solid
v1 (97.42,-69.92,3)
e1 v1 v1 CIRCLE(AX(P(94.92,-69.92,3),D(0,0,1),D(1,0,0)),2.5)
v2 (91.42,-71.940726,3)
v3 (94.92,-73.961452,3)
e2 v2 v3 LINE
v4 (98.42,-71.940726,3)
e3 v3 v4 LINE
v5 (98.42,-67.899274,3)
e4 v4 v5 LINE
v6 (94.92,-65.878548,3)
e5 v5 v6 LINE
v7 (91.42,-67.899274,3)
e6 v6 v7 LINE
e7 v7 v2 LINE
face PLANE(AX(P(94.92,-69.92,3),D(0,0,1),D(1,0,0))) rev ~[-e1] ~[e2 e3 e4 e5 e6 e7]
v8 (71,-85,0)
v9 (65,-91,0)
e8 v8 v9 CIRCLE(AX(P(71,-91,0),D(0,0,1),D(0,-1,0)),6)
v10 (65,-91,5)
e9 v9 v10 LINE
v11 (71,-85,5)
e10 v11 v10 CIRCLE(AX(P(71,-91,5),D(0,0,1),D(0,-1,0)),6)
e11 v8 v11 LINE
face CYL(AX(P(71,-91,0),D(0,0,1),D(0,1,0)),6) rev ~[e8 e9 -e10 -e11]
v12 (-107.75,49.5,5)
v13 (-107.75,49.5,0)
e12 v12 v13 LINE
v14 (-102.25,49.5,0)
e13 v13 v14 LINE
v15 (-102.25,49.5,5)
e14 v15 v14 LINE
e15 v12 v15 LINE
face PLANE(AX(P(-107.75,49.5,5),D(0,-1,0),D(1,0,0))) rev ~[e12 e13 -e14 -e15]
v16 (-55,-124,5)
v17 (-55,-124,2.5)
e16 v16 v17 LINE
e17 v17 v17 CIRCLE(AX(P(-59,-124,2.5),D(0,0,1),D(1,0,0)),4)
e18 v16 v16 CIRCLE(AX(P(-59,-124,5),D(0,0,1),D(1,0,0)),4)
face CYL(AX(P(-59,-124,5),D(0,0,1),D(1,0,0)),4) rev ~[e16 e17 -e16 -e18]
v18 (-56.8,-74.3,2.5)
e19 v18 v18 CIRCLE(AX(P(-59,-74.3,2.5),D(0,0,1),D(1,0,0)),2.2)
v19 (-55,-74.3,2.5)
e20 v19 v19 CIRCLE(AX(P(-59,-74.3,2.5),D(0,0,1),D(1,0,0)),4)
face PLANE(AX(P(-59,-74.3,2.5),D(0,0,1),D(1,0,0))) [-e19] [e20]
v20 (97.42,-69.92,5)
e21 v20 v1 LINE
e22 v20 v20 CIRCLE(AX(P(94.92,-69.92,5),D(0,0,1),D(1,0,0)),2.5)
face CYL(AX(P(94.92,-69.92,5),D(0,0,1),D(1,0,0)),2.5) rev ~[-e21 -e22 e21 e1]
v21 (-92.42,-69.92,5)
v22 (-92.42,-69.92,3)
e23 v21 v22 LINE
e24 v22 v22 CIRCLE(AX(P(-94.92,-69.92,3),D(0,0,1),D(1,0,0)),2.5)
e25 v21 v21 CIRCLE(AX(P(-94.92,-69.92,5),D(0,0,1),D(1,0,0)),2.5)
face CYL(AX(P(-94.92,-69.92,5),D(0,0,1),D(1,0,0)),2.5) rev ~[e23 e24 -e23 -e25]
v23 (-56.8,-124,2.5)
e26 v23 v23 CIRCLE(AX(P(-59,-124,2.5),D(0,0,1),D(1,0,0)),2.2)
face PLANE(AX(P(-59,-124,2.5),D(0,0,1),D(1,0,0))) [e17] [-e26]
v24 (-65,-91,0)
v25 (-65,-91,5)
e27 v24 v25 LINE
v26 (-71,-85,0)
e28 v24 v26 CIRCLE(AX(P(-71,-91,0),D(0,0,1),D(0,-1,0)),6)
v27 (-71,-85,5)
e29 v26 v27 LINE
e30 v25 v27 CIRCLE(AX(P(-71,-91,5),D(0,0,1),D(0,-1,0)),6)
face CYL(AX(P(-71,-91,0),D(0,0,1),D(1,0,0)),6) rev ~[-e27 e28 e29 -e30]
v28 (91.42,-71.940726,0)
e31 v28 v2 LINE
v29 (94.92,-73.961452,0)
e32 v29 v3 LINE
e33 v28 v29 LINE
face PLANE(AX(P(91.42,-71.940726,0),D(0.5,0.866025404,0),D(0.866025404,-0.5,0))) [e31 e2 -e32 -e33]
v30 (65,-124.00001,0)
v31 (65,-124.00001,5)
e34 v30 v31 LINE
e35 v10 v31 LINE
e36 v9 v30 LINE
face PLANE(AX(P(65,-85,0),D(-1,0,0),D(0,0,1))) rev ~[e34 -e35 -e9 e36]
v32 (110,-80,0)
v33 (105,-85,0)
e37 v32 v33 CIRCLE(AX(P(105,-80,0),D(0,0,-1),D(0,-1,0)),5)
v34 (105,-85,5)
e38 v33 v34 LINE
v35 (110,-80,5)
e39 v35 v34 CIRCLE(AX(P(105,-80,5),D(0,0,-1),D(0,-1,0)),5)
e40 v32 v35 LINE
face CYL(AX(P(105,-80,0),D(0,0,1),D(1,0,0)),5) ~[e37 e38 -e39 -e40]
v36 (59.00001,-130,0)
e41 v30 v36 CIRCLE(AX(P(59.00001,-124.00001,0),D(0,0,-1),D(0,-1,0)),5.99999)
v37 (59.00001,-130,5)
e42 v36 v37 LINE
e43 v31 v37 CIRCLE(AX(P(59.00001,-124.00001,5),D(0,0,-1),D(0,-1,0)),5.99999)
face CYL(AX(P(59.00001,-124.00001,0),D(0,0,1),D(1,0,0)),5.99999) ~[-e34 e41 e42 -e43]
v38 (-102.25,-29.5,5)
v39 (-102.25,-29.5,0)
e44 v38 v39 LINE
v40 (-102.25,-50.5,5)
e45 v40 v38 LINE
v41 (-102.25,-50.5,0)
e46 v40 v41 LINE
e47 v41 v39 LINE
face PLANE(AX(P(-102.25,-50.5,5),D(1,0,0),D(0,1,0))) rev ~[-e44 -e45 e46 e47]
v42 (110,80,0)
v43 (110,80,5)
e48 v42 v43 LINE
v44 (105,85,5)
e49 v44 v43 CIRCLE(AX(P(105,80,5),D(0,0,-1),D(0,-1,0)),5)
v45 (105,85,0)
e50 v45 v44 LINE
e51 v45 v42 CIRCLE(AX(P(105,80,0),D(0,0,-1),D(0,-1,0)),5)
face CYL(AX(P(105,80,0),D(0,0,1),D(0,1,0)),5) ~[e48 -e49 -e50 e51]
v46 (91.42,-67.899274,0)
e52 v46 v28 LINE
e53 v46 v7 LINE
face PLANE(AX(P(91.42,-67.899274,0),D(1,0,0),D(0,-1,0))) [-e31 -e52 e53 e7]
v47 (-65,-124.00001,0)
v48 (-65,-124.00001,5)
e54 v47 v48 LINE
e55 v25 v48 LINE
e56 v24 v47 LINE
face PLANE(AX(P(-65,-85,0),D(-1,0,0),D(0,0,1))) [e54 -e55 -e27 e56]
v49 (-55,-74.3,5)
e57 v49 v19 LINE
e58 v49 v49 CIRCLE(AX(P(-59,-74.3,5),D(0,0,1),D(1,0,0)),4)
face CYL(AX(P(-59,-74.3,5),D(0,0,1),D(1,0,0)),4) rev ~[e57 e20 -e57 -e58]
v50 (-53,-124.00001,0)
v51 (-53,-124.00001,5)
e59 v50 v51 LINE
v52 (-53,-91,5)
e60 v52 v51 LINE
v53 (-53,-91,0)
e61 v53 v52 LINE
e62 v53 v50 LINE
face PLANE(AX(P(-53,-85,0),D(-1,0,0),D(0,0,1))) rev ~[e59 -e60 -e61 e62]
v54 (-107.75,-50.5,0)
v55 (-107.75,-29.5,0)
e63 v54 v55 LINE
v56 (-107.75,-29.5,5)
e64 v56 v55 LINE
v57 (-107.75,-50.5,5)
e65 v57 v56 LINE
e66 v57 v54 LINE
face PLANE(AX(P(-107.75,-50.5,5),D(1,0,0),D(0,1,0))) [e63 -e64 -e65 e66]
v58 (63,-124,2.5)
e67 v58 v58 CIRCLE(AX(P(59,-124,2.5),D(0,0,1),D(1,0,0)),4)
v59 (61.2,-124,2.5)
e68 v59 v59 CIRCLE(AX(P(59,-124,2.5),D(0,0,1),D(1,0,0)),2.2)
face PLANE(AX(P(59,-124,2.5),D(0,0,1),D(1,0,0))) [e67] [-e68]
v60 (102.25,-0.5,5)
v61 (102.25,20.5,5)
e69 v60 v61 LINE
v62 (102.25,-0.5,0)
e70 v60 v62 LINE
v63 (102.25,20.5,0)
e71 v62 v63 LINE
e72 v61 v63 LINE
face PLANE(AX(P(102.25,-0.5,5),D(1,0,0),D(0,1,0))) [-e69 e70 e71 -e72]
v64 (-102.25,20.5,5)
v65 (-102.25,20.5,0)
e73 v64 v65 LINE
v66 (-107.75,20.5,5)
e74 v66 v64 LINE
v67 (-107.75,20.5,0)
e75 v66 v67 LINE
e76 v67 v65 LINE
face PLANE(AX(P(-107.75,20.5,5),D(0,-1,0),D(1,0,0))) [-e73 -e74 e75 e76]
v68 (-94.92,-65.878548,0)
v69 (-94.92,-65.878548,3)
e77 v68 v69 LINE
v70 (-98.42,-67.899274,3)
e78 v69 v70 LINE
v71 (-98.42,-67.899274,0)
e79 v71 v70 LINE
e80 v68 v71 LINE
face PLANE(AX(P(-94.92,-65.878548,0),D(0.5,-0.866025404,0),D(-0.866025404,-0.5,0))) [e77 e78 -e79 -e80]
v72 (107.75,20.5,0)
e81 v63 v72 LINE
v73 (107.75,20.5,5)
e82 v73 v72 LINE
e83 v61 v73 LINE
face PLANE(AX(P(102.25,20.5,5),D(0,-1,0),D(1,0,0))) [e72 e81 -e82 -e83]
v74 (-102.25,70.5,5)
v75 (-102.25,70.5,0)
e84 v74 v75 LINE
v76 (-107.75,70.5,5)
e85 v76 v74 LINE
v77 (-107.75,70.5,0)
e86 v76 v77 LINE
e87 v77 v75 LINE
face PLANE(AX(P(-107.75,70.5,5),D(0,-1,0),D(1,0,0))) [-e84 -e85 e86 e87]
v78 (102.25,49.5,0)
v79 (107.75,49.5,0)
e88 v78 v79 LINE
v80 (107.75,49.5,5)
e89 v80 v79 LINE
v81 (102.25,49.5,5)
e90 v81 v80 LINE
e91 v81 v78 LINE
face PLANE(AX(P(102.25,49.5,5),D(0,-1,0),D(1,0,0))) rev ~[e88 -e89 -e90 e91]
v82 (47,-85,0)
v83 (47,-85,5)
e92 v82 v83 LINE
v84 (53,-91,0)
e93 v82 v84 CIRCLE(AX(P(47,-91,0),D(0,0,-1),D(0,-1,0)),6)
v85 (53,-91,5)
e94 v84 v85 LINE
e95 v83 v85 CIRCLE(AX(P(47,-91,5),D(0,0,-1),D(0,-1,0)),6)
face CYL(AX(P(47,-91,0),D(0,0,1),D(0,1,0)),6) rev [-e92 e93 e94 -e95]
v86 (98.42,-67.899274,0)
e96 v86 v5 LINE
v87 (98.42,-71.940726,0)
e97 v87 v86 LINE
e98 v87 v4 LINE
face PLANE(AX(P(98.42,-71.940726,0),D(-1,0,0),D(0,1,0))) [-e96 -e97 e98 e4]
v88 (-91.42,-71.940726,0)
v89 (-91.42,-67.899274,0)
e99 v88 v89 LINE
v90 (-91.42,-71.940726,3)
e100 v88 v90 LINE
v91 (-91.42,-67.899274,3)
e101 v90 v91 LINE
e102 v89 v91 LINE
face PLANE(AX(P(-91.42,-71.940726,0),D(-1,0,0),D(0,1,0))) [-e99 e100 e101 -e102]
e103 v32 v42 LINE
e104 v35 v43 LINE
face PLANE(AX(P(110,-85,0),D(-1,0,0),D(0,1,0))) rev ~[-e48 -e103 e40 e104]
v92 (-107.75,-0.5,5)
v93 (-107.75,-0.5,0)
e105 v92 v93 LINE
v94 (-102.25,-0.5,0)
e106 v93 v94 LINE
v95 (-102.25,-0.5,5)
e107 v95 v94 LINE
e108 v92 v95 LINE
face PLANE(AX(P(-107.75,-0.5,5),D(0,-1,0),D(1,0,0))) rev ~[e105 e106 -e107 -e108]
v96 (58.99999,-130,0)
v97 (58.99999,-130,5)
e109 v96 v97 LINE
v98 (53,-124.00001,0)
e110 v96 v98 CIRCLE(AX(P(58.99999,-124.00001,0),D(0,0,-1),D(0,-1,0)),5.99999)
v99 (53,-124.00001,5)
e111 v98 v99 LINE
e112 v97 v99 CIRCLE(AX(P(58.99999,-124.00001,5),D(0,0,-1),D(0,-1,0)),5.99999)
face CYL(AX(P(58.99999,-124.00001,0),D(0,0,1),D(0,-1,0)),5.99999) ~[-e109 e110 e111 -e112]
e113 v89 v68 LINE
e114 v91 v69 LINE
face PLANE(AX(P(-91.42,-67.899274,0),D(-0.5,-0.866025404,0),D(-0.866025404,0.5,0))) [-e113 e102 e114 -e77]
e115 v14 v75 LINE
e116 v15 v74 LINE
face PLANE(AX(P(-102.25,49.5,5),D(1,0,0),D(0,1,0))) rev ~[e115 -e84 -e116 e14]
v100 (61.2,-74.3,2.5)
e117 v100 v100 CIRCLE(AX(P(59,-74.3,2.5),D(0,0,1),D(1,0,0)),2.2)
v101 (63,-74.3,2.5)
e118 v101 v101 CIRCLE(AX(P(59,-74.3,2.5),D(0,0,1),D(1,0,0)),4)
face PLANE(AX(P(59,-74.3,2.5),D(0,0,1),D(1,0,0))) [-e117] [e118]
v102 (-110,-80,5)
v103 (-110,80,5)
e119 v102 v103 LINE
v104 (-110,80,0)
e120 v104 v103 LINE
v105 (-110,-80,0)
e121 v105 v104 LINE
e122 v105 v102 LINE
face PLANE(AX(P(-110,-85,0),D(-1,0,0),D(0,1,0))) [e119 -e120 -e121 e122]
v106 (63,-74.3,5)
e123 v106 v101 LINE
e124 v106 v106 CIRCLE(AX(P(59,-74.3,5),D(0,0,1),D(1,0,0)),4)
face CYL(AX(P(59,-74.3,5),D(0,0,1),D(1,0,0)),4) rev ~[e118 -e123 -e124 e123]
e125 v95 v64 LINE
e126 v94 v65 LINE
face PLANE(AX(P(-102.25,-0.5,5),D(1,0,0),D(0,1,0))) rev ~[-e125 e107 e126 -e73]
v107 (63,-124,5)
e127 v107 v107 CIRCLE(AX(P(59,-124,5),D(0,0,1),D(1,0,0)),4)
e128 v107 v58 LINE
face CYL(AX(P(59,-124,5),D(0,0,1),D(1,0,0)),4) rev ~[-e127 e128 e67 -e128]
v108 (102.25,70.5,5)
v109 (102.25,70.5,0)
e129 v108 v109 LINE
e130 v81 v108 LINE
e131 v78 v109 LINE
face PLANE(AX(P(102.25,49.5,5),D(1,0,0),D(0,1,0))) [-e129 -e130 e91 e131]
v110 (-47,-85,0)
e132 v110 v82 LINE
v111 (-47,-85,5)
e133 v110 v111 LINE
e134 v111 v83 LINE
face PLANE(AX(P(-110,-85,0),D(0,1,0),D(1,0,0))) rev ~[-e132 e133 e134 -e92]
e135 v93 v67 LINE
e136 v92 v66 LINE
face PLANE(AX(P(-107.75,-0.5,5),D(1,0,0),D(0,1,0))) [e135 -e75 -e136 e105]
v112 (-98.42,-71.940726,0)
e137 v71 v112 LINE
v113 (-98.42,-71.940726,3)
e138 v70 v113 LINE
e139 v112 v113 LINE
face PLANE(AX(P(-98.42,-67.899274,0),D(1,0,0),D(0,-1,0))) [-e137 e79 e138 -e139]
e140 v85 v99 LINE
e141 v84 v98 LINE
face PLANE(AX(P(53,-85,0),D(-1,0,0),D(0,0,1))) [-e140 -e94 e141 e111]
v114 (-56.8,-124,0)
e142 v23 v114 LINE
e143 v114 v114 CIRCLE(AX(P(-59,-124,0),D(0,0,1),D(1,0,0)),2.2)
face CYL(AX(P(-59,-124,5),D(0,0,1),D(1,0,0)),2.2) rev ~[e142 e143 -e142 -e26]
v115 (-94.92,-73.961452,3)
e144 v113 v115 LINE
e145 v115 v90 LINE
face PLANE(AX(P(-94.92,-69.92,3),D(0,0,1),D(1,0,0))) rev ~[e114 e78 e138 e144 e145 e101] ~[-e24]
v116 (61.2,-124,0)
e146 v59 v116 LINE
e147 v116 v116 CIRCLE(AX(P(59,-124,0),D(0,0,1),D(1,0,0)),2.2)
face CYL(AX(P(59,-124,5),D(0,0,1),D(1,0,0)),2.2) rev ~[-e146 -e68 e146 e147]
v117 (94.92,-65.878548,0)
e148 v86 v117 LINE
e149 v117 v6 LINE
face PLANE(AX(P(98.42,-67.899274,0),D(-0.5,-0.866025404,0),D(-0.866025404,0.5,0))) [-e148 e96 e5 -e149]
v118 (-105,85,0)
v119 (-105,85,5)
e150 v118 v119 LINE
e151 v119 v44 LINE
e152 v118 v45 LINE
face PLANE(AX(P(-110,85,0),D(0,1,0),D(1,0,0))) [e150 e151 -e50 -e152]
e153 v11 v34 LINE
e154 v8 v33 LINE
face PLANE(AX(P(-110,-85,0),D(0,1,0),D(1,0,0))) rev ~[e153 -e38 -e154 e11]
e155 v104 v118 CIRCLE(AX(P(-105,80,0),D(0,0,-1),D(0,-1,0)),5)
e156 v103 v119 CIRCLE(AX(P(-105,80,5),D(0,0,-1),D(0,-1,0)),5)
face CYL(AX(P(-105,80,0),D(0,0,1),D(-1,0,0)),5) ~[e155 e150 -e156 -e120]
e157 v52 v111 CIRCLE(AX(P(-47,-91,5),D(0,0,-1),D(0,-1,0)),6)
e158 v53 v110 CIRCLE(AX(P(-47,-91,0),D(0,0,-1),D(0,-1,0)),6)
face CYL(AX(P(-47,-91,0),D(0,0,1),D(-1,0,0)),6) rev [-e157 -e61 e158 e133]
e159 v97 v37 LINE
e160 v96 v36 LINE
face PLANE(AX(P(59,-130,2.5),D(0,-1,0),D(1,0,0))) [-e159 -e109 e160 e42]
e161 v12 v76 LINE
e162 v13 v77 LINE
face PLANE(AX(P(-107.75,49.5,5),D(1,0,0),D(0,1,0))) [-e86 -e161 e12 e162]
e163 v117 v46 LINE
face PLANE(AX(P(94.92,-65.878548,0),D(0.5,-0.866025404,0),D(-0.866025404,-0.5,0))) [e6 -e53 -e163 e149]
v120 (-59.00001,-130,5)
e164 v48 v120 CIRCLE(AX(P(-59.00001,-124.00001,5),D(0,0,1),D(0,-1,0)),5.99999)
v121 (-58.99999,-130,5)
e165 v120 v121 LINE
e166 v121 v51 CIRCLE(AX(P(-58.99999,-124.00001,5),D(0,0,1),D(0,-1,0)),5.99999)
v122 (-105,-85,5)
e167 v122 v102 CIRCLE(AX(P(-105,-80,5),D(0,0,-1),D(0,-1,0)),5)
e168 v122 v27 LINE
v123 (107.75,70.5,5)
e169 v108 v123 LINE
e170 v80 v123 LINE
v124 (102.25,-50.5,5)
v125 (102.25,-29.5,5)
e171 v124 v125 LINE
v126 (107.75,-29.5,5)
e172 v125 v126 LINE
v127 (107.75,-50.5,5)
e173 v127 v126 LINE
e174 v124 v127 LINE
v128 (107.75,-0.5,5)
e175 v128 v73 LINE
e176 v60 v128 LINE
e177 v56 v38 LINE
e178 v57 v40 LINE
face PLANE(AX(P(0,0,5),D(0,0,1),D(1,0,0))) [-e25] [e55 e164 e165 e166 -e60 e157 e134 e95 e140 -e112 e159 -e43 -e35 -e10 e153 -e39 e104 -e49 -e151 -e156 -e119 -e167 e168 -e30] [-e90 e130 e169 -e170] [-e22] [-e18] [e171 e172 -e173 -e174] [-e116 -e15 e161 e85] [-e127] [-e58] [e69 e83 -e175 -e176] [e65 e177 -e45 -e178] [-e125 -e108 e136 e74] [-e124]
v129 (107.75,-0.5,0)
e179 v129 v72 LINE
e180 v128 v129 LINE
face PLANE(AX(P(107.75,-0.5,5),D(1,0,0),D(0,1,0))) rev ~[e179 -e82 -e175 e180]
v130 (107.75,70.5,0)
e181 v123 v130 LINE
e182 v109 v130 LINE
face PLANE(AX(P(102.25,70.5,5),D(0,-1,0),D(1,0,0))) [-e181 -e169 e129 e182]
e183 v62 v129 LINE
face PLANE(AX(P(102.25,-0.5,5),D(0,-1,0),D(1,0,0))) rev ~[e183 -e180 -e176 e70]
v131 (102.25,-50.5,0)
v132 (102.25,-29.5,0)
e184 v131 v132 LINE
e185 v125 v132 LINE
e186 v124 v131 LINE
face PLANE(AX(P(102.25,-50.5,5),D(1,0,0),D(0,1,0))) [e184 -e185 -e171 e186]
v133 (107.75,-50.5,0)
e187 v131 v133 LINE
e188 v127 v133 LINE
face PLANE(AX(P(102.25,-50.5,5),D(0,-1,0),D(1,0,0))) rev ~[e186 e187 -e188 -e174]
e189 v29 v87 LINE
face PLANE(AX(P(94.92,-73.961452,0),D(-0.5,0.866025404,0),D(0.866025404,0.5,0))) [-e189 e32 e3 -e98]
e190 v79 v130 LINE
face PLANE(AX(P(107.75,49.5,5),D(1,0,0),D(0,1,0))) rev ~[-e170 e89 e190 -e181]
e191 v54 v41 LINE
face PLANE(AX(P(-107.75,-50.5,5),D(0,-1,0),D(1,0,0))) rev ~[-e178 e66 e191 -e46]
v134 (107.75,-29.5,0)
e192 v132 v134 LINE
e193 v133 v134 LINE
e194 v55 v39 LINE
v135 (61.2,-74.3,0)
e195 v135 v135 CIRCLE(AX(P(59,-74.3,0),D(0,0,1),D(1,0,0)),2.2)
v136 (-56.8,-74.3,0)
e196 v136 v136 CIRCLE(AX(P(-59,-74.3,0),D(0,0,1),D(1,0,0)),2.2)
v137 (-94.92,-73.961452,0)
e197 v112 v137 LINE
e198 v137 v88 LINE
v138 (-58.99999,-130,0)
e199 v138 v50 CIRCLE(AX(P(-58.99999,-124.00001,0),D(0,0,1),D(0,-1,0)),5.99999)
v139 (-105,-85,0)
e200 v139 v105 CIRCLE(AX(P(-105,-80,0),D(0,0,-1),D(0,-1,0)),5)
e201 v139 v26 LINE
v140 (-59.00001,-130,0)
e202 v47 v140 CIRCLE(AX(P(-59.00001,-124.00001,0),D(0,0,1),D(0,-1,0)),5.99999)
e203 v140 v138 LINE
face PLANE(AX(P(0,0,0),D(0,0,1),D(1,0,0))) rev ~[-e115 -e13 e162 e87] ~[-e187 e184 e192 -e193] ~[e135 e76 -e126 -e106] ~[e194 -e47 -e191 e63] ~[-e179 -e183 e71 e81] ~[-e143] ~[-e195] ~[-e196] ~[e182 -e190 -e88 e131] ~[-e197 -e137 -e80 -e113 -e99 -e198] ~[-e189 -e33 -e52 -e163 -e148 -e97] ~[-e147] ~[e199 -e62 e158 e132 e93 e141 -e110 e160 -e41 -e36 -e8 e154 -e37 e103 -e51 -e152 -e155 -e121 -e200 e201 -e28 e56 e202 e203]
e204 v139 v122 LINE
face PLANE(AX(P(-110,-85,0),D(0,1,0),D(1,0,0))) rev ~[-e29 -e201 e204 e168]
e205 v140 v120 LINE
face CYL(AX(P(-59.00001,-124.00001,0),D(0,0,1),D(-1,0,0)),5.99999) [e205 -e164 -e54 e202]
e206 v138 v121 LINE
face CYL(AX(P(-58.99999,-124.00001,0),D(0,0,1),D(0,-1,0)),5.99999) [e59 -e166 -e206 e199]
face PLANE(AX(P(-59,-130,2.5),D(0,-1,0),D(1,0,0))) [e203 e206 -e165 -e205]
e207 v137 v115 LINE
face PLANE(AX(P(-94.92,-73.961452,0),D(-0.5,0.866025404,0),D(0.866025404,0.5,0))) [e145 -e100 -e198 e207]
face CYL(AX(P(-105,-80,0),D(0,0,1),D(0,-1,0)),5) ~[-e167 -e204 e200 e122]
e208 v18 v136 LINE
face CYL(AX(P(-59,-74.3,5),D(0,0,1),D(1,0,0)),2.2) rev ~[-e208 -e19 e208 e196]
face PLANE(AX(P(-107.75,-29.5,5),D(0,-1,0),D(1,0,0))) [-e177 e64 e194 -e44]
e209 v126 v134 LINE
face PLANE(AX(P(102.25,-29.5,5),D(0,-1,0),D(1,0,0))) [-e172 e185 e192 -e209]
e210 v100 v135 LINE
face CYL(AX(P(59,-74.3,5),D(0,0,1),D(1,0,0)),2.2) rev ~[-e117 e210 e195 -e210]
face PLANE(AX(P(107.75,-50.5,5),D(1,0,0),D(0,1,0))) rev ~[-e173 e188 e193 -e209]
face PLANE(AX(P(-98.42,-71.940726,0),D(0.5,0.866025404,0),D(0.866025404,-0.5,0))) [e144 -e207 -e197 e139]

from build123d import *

# Parameters (mm, degrees)
F0_W      = 220
F0_H      = 170
F0_W_2    = 200
F0_H_2    = 150
F1_DEPTH  = 5
F2_W      = 5.5
F2_H      = 21
F3_DEPTH  = 25
F4_W      = 12
F4_H      = 5
F5_DEPTH  = 45
F6_R      = 2.2
F7_DEPTH  = 25
F8_R      = 5.99999
F9_R      = 6
F10_R     = 4
F11_DEPTH = 2.5
F13_R     = 5
F15_DEPTH = 3
F12_R     = 2.5
F16_DEPTH = 3


# Not quite as in the source:
# - a fillet or chamfer is up to 0.001 mm smaller than in the source, because OpenCascade refuses the exact size


with BuildPart() as f1:
    # F0 (on Top) → F1 (new body)
    with BuildSketch(Plane.XY):
        Rectangle(F0_W, F0_H)
        Rectangle(F0_W_2, F0_H_2, mode=Mode.SUBTRACT)
        Rectangle(F0_W_2, F0_H_2)
    extrude(amount=F1_DEPTH)

    # F2 (on face) → F3 (cut)
    with BuildSketch(Plane.XY.offset(5)):
        with Locations((-105, 60)):
            Rectangle(F2_W, F2_H)
        with Locations((-105, 10)):
            Rectangle(F2_W, F2_H)
        with Locations((-105, -40)):
            Rectangle(F2_W, F2_H)
        with Locations((105, 60)):
            Rectangle(F2_W, F2_H)
        with Locations((105, 10)):
            Rectangle(F2_W, F2_H)
        with Locations((105, -40)):
            Rectangle(F2_W, F2_H)
    extrude(amount=-F3_DEPTH, mode=Mode.SUBTRACT)

    # F4 (on face) → F5 (join)
    with BuildSketch(Plane.XZ.offset(85)):
        with Locations((59, 2.5)):
            Rectangle(F4_W, F4_H)
        with Locations((-59, 2.5)):
            Rectangle(F4_W, F4_H)
    extrude(amount=F5_DEPTH)

    # F6 (on face) → F7 (cut)
    with BuildSketch(Plane.XY.offset(5)):
        with Locations((-59, -74.3)):
            Circle(F6_R)
        with Locations((-59, -124)):
            Circle(F6_R)
        with Locations((59, -74.3)):
            Circle(F6_R)
        with Locations((59, -124)):
            Circle(F6_R)
    extrude(amount=-F7_DEPTH, mode=Mode.SUBTRACT)

    # F8 (radius 6 in the source; OpenCascade refuses exactly that, so slightly less here)
    f8_edges = [f1.edges().sort_by_distance(p)[0] for p in [
        (-65, -130, 2.5),
        (-53, -130, 2.5),
        (53, -130, 2.5),
        (65, -130, 2.5),
    ]]
    fillet(f8_edges, radius=F8_R)

    # F9
    f9_edges = [f1.edges().sort_by_distance(p)[0] for p in [
        (-65, -85, 2.5),
        (-53, -85, 2.5),
        (53, -85, 2.5),
        (65, -85, 2.5),
    ]]
    fillet(f9_edges, radius=F9_R)

    # F10 (on face) → F11 (cut)
    with BuildSketch(Plane.XY.offset(5)):
        with Locations((-59, -124)):
            Circle(F10_R)
        with Locations((-59, -74.3)):
            Circle(F10_R)
        with Locations((59, -74.3)):
            Circle(F10_R)
        with Locations((59, -124)):
            Circle(F10_R)
    extrude(amount=-F11_DEPTH, mode=Mode.SUBTRACT)

    # F13
    f13_edges = [f1.edges().sort_by_distance(p)[0] for p in [
        (-110, -85, 2.5),
        (110, -85, 2.5),
        (110, 85, 2.5),
        (-110, 85, 2.5),
    ]]
    fillet(f13_edges, radius=F13_R)

    # F14 (on face) → F15 (cut)
    with BuildSketch(Plane.XY):
        Polygon((-98.42, -67.8992740578), (-98.42, -71.9407259422), (-94.92, -73.9614518843), (-91.42, -71.9407259422), (-91.42, -67.8992740578), (-94.92, -65.8785481157), align=None)
        Polygon((98.42, -71.9407259422), (98.42, -67.8992740578), (94.92, -65.8785481157), (91.42, -67.8992740578), (91.42, -71.9407259422), (94.92, -73.9614518843), align=None)
    extrude(amount=F15_DEPTH, mode=Mode.SUBTRACT)

    # F12 (on face) → F16 (cut)
    with BuildSketch(Plane.XY.offset(5)):
        with Locations((94.92, -69.92)):
            Circle(F12_R)
        with Locations((-94.92, -69.92)):
            Circle(F12_R)
    extrude(amount=-F16_DEPTH, mode=Mode.SUBTRACT)


solid = f1.part
